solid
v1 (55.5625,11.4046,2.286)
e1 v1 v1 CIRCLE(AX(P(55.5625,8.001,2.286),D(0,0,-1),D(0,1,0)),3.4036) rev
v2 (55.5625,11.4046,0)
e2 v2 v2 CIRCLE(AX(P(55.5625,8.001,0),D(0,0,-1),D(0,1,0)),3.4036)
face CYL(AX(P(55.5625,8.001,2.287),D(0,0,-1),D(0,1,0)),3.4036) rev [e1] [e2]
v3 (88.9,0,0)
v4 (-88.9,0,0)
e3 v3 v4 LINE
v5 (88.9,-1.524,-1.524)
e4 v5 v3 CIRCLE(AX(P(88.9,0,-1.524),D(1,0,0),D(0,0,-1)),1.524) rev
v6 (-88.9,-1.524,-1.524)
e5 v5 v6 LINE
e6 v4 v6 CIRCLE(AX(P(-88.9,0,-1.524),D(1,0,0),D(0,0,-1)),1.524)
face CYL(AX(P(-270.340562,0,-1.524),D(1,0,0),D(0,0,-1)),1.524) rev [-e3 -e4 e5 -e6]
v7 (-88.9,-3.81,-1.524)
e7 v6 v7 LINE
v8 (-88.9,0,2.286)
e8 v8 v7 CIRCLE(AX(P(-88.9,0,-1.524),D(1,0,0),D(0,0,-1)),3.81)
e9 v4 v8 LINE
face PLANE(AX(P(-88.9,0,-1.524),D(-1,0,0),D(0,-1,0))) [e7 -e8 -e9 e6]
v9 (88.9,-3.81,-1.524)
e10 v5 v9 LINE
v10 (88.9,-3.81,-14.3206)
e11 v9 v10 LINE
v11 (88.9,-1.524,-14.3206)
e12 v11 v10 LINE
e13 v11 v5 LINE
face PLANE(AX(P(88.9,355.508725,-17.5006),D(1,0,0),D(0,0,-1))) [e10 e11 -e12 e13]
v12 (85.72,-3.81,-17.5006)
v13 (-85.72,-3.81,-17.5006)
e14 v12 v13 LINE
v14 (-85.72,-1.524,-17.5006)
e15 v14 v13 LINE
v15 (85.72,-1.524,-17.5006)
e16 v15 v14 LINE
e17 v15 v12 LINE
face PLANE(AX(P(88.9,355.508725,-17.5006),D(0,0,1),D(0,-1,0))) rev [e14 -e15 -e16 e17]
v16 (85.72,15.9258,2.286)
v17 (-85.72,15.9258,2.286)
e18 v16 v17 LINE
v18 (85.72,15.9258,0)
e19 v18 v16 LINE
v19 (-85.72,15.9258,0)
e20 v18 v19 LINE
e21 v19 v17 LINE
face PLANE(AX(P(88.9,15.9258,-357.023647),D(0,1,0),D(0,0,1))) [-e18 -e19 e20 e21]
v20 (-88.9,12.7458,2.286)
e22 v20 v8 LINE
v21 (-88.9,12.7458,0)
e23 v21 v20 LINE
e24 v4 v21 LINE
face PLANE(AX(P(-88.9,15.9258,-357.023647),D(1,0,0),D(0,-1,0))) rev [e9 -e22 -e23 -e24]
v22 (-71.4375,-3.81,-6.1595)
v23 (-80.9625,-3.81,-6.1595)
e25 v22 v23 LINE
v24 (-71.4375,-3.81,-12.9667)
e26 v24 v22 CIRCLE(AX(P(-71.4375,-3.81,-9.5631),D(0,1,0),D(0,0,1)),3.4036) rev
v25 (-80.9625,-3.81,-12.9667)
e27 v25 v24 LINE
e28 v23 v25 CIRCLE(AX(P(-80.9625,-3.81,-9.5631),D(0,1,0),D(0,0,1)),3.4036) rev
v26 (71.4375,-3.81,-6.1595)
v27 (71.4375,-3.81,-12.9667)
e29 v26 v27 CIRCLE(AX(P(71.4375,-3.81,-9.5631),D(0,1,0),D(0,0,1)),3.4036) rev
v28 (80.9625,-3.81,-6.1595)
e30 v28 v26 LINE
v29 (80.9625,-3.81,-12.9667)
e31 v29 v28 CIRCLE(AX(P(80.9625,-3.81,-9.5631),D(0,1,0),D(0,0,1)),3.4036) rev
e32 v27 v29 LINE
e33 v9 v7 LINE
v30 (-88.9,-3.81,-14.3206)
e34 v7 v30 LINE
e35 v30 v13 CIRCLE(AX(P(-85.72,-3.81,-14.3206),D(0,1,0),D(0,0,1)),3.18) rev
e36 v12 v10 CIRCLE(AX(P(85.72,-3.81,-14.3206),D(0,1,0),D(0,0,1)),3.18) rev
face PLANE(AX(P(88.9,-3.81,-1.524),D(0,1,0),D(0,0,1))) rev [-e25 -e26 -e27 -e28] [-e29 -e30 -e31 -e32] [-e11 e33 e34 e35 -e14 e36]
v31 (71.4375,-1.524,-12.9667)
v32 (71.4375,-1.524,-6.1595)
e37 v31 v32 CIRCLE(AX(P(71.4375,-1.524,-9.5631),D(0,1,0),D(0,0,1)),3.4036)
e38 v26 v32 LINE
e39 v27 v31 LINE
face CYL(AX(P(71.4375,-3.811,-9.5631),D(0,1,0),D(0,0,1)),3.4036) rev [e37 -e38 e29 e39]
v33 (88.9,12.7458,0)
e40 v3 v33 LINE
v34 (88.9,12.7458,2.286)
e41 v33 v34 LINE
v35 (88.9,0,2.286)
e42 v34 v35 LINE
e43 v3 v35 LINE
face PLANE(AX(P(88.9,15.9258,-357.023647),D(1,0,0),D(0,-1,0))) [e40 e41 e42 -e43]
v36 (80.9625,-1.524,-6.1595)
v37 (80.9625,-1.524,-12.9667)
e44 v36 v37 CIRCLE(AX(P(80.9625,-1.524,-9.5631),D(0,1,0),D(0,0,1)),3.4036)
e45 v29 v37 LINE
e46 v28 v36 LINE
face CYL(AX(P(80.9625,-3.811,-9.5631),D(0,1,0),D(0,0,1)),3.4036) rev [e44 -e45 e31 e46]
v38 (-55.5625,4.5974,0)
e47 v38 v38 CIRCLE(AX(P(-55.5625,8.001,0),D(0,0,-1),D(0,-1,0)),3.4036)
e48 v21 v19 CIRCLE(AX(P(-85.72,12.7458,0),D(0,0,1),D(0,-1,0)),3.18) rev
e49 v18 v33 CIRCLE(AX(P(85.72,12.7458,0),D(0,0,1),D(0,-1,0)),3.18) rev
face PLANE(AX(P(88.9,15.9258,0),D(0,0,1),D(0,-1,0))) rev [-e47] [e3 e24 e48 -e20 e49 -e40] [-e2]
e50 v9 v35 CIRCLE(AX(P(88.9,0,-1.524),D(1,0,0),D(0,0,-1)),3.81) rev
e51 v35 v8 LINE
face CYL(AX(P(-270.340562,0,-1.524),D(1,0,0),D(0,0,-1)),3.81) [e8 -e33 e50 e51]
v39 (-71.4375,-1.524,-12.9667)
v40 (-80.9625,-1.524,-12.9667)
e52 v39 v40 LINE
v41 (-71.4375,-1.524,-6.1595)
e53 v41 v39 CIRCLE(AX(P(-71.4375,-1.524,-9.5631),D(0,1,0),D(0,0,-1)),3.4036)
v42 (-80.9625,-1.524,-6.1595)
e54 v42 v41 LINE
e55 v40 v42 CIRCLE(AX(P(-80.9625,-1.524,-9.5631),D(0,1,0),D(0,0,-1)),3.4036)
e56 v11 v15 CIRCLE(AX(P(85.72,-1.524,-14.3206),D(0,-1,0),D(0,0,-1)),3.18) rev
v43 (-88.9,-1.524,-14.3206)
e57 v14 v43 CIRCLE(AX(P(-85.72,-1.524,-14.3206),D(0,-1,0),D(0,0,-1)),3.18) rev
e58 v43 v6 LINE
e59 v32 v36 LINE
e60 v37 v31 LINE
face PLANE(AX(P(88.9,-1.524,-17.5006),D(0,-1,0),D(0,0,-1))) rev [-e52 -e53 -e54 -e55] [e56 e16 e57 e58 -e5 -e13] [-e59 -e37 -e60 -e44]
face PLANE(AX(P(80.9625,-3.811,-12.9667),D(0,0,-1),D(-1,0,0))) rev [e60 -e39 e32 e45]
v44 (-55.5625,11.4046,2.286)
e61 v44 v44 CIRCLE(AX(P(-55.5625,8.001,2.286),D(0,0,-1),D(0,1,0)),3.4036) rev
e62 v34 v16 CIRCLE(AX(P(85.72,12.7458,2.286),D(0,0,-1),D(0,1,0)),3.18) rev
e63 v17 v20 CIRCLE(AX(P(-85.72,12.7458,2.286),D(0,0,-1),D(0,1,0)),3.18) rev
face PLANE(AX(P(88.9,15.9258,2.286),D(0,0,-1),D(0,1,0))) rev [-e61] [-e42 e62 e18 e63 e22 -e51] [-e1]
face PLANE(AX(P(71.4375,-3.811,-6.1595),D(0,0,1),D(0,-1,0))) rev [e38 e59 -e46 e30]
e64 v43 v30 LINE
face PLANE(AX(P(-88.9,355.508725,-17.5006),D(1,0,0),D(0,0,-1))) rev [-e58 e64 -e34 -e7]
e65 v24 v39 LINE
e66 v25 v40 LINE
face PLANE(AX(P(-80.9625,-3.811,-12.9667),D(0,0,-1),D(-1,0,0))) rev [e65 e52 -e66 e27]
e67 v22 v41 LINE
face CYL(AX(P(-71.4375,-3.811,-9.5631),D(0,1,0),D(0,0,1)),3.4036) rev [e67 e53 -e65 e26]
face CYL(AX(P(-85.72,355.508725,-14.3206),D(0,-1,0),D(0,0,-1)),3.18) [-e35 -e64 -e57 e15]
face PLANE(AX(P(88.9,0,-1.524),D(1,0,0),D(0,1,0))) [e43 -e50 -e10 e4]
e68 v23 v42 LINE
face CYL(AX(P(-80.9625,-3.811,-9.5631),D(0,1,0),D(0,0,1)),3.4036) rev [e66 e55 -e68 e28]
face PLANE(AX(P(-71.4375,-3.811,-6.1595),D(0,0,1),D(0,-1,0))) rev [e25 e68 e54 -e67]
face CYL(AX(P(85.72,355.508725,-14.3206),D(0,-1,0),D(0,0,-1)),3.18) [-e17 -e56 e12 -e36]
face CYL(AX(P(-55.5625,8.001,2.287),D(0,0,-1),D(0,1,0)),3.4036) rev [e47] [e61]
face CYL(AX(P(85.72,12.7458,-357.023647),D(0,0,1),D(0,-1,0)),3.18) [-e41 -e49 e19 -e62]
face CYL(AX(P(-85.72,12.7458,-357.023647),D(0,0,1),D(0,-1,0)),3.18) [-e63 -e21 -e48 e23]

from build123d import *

# Parameters (mm, degrees)
EXTRUDE1_DEPTH             = 88.9
FILLET1_R                  = 3.18
EXTRUDE2_REACH             = 94.271
EXTRUDE3_REACH             = 93.995
SKETCH3_R                  = 3.4036
FLATTEN_BENDS1_START       = -1.524
FLATTEN_BENDS1_OUTLINE_W   = 177.8
FLATTEN_BENDS1_OUTLINE_H   = 5.286
FLATTEN_BENDS1_DEPTH       = 17.4498
FLATTEN_BENDS1_START_2     = -3.81
FLATTEN_BENDS1_2_OUTLINE_R = 3.4036
FLATTEN_BENDS1_2_DEPTH     = 2.286
PROCESS_BENDS1_START       = 2.234903703
PROCESS_BENDS1_OUTLINE_W   = 177.8
PROCESS_BENDS1_OUTLINE_H   = 2.286
PROCESS_BENDS1_DEPTH       = 16.356210101
PROCESS_BENDS1_2_OUTLINE_R = 3.4036
PROCESS_BENDS1_2_DEPTH     = 1.8835878
PROCESS_BENDS1_START_2     = 2.04455268
PROCESS_BENDS1_3_OUTLINE_W = 177.8
PROCESS_BENDS1_3_OUTLINE_H = 2.286
PROCESS_BENDS1_3_DEPTH     = 0.190351023
PROCESS_BENDS1_START_3     = -1.524
PROCESS_BENDS1_4_OUTLINE_R = 3.4036
PROCESS_BENDS1_4_DEPTH     = 3.81
PROCESS_BENDS1_START_4     = -88.9
PROCESS_BENDS1_5_DEPTH     = 177.8


with BuildPart() as part:
    # Sketch1 → Extrude1 (new, symmetric)
    with BuildSketch(Plane(origin=(0, 0, 0), x_dir=(0, 0, -1), z_dir=(1, 0, 0))):
        with BuildLine():
            Line((17.5006, -3.81), (17.5006, -1.524))
            Line((17.5006, -1.524), (1.524, -1.524))
            ThreePointArc((1.524, -1.524), (0.446369265, -1.077630735), (0, 0))
            Line((0, 0), (0, 15.9258))
            Line((0, 15.9258), (-2.286, 15.9258))
            Line((-2.286, 15.9258), (-2.286, 0))
            ThreePointArc((-2.286, 0), (-1.170076836, -2.694076836), (1.524, -3.81))
            Line((1.524, -3.81), (17.5006, -3.81))
        make_face()
    extrude(amount=EXTRUDE1_DEPTH, both=True)

    # Fillet1
    fillet1_edges = [part.edges().sort_by_distance(p)[0] for p in [
        (-88.9, -2.667, -17.5006),
        (88.9, 15.9258, 1.143),
        (88.9, -2.667, -17.5006),
        (-88.9, 15.9258, 1.143),
    ]]
    fillet(fillet1_edges, radius=FILLET1_R)

    # Sketch2 → Extrude2 (cut, up to next)
    with BuildSketch(Plane(origin=(0, -1.524, 0), x_dir=(1, 0, 0), z_dir=(0, 1, 0)), mode=Mode.PRIVATE) as extrude2_sk1:
        with BuildLine():
            Line((80.9625, 12.9667), (71.4375, 12.9667))
            ThreePointArc((71.4375, 12.9667), (68.0339, 9.5631), (71.4375, 6.1595))
            Line((71.4375, 6.1595), (80.9625, 6.1595))
            ThreePointArc((80.9625, 6.1595), (84.3661, 9.5631), (80.9625, 12.9667))
        make_face()
    extrude2_tool1 = extrude(extrude2_sk1.sketch, amount=-EXTRUDE2_REACH, mode=Mode.PRIVATE) & part.part
    # Sketch2 → Extrude2 (cut, up to next)
    with BuildSketch(Plane(origin=(0, -1.524, 0), x_dir=(1, 0, 0), z_dir=(0, 1, 0)), mode=Mode.PRIVATE) as extrude2_sk2:
        with BuildLine():
            Line((-71.4375, 6.1595), (-80.9625, 6.1595))
            ThreePointArc((-80.9625, 6.1595), (-84.3661, 9.5631), (-80.9625, 12.9667))
            Line((-80.9625, 12.9667), (-71.4375, 12.9667))
            ThreePointArc((-71.4375, 12.9667), (-68.0339, 9.5631), (-71.4375, 6.1595))
        make_face()
    extrude2_tool2 = extrude(extrude2_sk2.sketch, amount=-EXTRUDE2_REACH, mode=Mode.PRIVATE) & part.part
    add(extrude2_tool1.solids().sort_by_distance((76.2, -1.524, -9.5631))[0], mode=Mode.SUBTRACT)
    add(extrude2_tool2.solids().sort_by_distance((-76.2, -1.524, -9.5631))[0], mode=Mode.SUBTRACT)

    # Sketch3 → Extrude3 (cut, up to next)
    with BuildSketch(Plane(origin=(0, 0, 0), x_dir=(-1, 0, 0), z_dir=(0, 0, -1)), mode=Mode.PRIVATE) as extrude3_sk1:
        with Locations(Location((-55.5625, 8.001, 0), (0, 0, 90))):
            Circle(SKETCH3_R)
    extrude3_tool1 = extrude(extrude3_sk1.sketch, amount=-EXTRUDE3_REACH, mode=Mode.PRIVATE) & part.part
    # Sketch3 → Extrude3 (cut, up to next)
    with BuildSketch(Plane(origin=(0, 0, 0), x_dir=(-1, 0, 0), z_dir=(0, 0, -1)), mode=Mode.PRIVATE) as extrude3_sk2:
        with Locations(Location((55.5625, 8.001, 0), (0, 0, 90))):
            Circle(SKETCH3_R)
    extrude3_tool2 = extrude(extrude3_sk2.sketch, amount=-EXTRUDE3_REACH, mode=Mode.PRIVATE) & part.part
    add(extrude3_tool1.solids().sort_by_distance((55.5625, 8.001, 0))[0], mode=Mode.SUBTRACT)
    add(extrude3_tool2.solids().sort_by_distance((-55.5625, 8.001, 0))[0], mode=Mode.SUBTRACT)

    # Flatten-Bends1: read off the stored shape, not the designer's step
    # Flatten-Bends1 outline → Flatten-Bends1 (cut)
    with BuildSketch(Plane(origin=(0, 0, 0), x_dir=(1, 0, 0), z_dir=(0, 1, 0)).offset(FLATTEN_BENDS1_START)):
        with Locations((0, 0.357)):
            Rectangle(FLATTEN_BENDS1_OUTLINE_W, FLATTEN_BENDS1_OUTLINE_H)
    extrude(amount=FLATTEN_BENDS1_DEPTH, mode=Mode.SUBTRACT)

    # Flatten-Bends1 2 outline → Flatten-Bends1 2 (add)
    with BuildSketch(Plane(origin=(0, 0, 0), x_dir=(1, 0, 0), z_dir=(0, 1, 0)).offset(FLATTEN_BENDS1_START_2)):
        with BuildLine():
            ThreePointArc((-88.9, -15.411113804), (-87.968599564, -17.659713368), (-85.72, -18.591113804))
            Line((-85.72, -18.591113804), (85.72, -18.591113804))
            ThreePointArc((85.72, -18.591113804), (87.968599564, -17.659713368), (88.9, -15.411113804))
            Line((88.9, -15.411113804), (88.9, 3))
            Line((88.9, 3), (-88.9, 3))
            Line((-88.9, 3), (-88.9, -15.411113804))
        make_face()
        with Locations((-55.5625, -10.666313804)):
            Circle(FLATTEN_BENDS1_2_OUTLINE_R, mode=Mode.SUBTRACT)
        with Locations((55.5625, -10.666313804)):
            Circle(FLATTEN_BENDS1_2_OUTLINE_R, mode=Mode.SUBTRACT)
    extrude(amount=FLATTEN_BENDS1_2_DEPTH)

    # Process-Bends1: read off the stored shape, not the designer's step
    # Process-Bends1 outline → Process-Bends1 (cut)
    with BuildSketch(Plane.XY.offset(PROCESS_BENDS1_START)):
        with Locations((0, -2.667)):
            Rectangle(PROCESS_BENDS1_OUTLINE_W, PROCESS_BENDS1_OUTLINE_H)
    extrude(amount=PROCESS_BENDS1_DEPTH, mode=Mode.SUBTRACT)

    # Process-Bends1 2 outline → Process-Bends1 2 (add)
    with BuildSketch(Plane.XY):
        with BuildLine():
            Line((-88.9, 12.7458), (-88.9, -1.524))
            Line((-88.9, -1.524), (88.9, -1.524))
            Line((88.9, -1.524), (88.9, 12.7458))
            ThreePointArc((88.9, 12.7458), (87.968599564, 14.994399564), (85.72, 15.9258))
            Line((85.72, 15.9258), (-85.72, 15.9258))
            ThreePointArc((-85.72, 15.9258), (-87.968599564, 14.994399564), (-88.9, 12.7458))
        make_face()
        with Locations((-55.5625, 8.001)):
            Circle(PROCESS_BENDS1_2_OUTLINE_R, mode=Mode.SUBTRACT)
        with Locations((55.5625, 8.001)):
            Circle(PROCESS_BENDS1_2_OUTLINE_R, mode=Mode.SUBTRACT)
    extrude(amount=PROCESS_BENDS1_2_DEPTH)

    # Process-Bends1 3 outline → Process-Bends1 3 (cut)
    with BuildSketch(Plane.XY.offset(PROCESS_BENDS1_START_2)):
        with Locations((0, -2.667)):
            Rectangle(PROCESS_BENDS1_3_OUTLINE_W, PROCESS_BENDS1_3_OUTLINE_H)
    extrude(amount=PROCESS_BENDS1_3_DEPTH, mode=Mode.SUBTRACT)

    # Process-Bends1 4 outline → Process-Bends1 4 (add)
    with BuildSketch(Plane.XY.offset(PROCESS_BENDS1_START_3)):
        with BuildLine():
            Line((-88.9, 12.7458), (-88.9, -1.524))
            Line((-88.9, -1.524), (88.9, -1.524))
            Line((88.9, -1.524), (88.9, 12.7458))
            ThreePointArc((88.9, 12.7458), (87.968599564, 14.994399564), (85.72, 15.9258))
            Line((85.72, 15.9258), (-85.72, 15.9258))
            ThreePointArc((-85.72, 15.9258), (-87.968599564, 14.994399564), (-88.9, 12.7458))
        make_face()
        with Locations((-55.5625, 8.001)):
            Circle(PROCESS_BENDS1_4_OUTLINE_R, mode=Mode.SUBTRACT)
        with Locations((55.5625, 8.001)):
            Circle(PROCESS_BENDS1_4_OUTLINE_R, mode=Mode.SUBTRACT)
    extrude(amount=PROCESS_BENDS1_4_DEPTH)

    # Process-Bends1 5 outline → Process-Bends1 5 (cut)
    with BuildSketch(Plane.YZ.offset(PROCESS_BENDS1_START_4)):
        with BuildLine():
            Line((15.9258, -1.524), (15.9258, 0))
            Line((15.9258, 0), (0, 0))
            ThreePointArc((0, 0), (-1.077630735, -0.446369265), (-1.524, -1.524))
            Line((-1.524, -1.524), (15.9258, -1.524))
        make_face()
        with BuildLine():
            ThreePointArc((-3.81, -1.524), (-2.694076836, 1.170076836), (0, 2.286))
            Line((0, 2.286), (-1.524, 2.286))
            Line((-1.524, 2.286), (-1.524, 2.04455268))
            Line((-1.524, 2.04455268), (-3.81, 2.04455268))
            Line((-3.81, 2.04455268), (-3.81, -1.524))
        make_face()
    extrude(amount=PROCESS_BENDS1_5_DEPTH, mode=Mode.SUBTRACT)


solid = part.part
